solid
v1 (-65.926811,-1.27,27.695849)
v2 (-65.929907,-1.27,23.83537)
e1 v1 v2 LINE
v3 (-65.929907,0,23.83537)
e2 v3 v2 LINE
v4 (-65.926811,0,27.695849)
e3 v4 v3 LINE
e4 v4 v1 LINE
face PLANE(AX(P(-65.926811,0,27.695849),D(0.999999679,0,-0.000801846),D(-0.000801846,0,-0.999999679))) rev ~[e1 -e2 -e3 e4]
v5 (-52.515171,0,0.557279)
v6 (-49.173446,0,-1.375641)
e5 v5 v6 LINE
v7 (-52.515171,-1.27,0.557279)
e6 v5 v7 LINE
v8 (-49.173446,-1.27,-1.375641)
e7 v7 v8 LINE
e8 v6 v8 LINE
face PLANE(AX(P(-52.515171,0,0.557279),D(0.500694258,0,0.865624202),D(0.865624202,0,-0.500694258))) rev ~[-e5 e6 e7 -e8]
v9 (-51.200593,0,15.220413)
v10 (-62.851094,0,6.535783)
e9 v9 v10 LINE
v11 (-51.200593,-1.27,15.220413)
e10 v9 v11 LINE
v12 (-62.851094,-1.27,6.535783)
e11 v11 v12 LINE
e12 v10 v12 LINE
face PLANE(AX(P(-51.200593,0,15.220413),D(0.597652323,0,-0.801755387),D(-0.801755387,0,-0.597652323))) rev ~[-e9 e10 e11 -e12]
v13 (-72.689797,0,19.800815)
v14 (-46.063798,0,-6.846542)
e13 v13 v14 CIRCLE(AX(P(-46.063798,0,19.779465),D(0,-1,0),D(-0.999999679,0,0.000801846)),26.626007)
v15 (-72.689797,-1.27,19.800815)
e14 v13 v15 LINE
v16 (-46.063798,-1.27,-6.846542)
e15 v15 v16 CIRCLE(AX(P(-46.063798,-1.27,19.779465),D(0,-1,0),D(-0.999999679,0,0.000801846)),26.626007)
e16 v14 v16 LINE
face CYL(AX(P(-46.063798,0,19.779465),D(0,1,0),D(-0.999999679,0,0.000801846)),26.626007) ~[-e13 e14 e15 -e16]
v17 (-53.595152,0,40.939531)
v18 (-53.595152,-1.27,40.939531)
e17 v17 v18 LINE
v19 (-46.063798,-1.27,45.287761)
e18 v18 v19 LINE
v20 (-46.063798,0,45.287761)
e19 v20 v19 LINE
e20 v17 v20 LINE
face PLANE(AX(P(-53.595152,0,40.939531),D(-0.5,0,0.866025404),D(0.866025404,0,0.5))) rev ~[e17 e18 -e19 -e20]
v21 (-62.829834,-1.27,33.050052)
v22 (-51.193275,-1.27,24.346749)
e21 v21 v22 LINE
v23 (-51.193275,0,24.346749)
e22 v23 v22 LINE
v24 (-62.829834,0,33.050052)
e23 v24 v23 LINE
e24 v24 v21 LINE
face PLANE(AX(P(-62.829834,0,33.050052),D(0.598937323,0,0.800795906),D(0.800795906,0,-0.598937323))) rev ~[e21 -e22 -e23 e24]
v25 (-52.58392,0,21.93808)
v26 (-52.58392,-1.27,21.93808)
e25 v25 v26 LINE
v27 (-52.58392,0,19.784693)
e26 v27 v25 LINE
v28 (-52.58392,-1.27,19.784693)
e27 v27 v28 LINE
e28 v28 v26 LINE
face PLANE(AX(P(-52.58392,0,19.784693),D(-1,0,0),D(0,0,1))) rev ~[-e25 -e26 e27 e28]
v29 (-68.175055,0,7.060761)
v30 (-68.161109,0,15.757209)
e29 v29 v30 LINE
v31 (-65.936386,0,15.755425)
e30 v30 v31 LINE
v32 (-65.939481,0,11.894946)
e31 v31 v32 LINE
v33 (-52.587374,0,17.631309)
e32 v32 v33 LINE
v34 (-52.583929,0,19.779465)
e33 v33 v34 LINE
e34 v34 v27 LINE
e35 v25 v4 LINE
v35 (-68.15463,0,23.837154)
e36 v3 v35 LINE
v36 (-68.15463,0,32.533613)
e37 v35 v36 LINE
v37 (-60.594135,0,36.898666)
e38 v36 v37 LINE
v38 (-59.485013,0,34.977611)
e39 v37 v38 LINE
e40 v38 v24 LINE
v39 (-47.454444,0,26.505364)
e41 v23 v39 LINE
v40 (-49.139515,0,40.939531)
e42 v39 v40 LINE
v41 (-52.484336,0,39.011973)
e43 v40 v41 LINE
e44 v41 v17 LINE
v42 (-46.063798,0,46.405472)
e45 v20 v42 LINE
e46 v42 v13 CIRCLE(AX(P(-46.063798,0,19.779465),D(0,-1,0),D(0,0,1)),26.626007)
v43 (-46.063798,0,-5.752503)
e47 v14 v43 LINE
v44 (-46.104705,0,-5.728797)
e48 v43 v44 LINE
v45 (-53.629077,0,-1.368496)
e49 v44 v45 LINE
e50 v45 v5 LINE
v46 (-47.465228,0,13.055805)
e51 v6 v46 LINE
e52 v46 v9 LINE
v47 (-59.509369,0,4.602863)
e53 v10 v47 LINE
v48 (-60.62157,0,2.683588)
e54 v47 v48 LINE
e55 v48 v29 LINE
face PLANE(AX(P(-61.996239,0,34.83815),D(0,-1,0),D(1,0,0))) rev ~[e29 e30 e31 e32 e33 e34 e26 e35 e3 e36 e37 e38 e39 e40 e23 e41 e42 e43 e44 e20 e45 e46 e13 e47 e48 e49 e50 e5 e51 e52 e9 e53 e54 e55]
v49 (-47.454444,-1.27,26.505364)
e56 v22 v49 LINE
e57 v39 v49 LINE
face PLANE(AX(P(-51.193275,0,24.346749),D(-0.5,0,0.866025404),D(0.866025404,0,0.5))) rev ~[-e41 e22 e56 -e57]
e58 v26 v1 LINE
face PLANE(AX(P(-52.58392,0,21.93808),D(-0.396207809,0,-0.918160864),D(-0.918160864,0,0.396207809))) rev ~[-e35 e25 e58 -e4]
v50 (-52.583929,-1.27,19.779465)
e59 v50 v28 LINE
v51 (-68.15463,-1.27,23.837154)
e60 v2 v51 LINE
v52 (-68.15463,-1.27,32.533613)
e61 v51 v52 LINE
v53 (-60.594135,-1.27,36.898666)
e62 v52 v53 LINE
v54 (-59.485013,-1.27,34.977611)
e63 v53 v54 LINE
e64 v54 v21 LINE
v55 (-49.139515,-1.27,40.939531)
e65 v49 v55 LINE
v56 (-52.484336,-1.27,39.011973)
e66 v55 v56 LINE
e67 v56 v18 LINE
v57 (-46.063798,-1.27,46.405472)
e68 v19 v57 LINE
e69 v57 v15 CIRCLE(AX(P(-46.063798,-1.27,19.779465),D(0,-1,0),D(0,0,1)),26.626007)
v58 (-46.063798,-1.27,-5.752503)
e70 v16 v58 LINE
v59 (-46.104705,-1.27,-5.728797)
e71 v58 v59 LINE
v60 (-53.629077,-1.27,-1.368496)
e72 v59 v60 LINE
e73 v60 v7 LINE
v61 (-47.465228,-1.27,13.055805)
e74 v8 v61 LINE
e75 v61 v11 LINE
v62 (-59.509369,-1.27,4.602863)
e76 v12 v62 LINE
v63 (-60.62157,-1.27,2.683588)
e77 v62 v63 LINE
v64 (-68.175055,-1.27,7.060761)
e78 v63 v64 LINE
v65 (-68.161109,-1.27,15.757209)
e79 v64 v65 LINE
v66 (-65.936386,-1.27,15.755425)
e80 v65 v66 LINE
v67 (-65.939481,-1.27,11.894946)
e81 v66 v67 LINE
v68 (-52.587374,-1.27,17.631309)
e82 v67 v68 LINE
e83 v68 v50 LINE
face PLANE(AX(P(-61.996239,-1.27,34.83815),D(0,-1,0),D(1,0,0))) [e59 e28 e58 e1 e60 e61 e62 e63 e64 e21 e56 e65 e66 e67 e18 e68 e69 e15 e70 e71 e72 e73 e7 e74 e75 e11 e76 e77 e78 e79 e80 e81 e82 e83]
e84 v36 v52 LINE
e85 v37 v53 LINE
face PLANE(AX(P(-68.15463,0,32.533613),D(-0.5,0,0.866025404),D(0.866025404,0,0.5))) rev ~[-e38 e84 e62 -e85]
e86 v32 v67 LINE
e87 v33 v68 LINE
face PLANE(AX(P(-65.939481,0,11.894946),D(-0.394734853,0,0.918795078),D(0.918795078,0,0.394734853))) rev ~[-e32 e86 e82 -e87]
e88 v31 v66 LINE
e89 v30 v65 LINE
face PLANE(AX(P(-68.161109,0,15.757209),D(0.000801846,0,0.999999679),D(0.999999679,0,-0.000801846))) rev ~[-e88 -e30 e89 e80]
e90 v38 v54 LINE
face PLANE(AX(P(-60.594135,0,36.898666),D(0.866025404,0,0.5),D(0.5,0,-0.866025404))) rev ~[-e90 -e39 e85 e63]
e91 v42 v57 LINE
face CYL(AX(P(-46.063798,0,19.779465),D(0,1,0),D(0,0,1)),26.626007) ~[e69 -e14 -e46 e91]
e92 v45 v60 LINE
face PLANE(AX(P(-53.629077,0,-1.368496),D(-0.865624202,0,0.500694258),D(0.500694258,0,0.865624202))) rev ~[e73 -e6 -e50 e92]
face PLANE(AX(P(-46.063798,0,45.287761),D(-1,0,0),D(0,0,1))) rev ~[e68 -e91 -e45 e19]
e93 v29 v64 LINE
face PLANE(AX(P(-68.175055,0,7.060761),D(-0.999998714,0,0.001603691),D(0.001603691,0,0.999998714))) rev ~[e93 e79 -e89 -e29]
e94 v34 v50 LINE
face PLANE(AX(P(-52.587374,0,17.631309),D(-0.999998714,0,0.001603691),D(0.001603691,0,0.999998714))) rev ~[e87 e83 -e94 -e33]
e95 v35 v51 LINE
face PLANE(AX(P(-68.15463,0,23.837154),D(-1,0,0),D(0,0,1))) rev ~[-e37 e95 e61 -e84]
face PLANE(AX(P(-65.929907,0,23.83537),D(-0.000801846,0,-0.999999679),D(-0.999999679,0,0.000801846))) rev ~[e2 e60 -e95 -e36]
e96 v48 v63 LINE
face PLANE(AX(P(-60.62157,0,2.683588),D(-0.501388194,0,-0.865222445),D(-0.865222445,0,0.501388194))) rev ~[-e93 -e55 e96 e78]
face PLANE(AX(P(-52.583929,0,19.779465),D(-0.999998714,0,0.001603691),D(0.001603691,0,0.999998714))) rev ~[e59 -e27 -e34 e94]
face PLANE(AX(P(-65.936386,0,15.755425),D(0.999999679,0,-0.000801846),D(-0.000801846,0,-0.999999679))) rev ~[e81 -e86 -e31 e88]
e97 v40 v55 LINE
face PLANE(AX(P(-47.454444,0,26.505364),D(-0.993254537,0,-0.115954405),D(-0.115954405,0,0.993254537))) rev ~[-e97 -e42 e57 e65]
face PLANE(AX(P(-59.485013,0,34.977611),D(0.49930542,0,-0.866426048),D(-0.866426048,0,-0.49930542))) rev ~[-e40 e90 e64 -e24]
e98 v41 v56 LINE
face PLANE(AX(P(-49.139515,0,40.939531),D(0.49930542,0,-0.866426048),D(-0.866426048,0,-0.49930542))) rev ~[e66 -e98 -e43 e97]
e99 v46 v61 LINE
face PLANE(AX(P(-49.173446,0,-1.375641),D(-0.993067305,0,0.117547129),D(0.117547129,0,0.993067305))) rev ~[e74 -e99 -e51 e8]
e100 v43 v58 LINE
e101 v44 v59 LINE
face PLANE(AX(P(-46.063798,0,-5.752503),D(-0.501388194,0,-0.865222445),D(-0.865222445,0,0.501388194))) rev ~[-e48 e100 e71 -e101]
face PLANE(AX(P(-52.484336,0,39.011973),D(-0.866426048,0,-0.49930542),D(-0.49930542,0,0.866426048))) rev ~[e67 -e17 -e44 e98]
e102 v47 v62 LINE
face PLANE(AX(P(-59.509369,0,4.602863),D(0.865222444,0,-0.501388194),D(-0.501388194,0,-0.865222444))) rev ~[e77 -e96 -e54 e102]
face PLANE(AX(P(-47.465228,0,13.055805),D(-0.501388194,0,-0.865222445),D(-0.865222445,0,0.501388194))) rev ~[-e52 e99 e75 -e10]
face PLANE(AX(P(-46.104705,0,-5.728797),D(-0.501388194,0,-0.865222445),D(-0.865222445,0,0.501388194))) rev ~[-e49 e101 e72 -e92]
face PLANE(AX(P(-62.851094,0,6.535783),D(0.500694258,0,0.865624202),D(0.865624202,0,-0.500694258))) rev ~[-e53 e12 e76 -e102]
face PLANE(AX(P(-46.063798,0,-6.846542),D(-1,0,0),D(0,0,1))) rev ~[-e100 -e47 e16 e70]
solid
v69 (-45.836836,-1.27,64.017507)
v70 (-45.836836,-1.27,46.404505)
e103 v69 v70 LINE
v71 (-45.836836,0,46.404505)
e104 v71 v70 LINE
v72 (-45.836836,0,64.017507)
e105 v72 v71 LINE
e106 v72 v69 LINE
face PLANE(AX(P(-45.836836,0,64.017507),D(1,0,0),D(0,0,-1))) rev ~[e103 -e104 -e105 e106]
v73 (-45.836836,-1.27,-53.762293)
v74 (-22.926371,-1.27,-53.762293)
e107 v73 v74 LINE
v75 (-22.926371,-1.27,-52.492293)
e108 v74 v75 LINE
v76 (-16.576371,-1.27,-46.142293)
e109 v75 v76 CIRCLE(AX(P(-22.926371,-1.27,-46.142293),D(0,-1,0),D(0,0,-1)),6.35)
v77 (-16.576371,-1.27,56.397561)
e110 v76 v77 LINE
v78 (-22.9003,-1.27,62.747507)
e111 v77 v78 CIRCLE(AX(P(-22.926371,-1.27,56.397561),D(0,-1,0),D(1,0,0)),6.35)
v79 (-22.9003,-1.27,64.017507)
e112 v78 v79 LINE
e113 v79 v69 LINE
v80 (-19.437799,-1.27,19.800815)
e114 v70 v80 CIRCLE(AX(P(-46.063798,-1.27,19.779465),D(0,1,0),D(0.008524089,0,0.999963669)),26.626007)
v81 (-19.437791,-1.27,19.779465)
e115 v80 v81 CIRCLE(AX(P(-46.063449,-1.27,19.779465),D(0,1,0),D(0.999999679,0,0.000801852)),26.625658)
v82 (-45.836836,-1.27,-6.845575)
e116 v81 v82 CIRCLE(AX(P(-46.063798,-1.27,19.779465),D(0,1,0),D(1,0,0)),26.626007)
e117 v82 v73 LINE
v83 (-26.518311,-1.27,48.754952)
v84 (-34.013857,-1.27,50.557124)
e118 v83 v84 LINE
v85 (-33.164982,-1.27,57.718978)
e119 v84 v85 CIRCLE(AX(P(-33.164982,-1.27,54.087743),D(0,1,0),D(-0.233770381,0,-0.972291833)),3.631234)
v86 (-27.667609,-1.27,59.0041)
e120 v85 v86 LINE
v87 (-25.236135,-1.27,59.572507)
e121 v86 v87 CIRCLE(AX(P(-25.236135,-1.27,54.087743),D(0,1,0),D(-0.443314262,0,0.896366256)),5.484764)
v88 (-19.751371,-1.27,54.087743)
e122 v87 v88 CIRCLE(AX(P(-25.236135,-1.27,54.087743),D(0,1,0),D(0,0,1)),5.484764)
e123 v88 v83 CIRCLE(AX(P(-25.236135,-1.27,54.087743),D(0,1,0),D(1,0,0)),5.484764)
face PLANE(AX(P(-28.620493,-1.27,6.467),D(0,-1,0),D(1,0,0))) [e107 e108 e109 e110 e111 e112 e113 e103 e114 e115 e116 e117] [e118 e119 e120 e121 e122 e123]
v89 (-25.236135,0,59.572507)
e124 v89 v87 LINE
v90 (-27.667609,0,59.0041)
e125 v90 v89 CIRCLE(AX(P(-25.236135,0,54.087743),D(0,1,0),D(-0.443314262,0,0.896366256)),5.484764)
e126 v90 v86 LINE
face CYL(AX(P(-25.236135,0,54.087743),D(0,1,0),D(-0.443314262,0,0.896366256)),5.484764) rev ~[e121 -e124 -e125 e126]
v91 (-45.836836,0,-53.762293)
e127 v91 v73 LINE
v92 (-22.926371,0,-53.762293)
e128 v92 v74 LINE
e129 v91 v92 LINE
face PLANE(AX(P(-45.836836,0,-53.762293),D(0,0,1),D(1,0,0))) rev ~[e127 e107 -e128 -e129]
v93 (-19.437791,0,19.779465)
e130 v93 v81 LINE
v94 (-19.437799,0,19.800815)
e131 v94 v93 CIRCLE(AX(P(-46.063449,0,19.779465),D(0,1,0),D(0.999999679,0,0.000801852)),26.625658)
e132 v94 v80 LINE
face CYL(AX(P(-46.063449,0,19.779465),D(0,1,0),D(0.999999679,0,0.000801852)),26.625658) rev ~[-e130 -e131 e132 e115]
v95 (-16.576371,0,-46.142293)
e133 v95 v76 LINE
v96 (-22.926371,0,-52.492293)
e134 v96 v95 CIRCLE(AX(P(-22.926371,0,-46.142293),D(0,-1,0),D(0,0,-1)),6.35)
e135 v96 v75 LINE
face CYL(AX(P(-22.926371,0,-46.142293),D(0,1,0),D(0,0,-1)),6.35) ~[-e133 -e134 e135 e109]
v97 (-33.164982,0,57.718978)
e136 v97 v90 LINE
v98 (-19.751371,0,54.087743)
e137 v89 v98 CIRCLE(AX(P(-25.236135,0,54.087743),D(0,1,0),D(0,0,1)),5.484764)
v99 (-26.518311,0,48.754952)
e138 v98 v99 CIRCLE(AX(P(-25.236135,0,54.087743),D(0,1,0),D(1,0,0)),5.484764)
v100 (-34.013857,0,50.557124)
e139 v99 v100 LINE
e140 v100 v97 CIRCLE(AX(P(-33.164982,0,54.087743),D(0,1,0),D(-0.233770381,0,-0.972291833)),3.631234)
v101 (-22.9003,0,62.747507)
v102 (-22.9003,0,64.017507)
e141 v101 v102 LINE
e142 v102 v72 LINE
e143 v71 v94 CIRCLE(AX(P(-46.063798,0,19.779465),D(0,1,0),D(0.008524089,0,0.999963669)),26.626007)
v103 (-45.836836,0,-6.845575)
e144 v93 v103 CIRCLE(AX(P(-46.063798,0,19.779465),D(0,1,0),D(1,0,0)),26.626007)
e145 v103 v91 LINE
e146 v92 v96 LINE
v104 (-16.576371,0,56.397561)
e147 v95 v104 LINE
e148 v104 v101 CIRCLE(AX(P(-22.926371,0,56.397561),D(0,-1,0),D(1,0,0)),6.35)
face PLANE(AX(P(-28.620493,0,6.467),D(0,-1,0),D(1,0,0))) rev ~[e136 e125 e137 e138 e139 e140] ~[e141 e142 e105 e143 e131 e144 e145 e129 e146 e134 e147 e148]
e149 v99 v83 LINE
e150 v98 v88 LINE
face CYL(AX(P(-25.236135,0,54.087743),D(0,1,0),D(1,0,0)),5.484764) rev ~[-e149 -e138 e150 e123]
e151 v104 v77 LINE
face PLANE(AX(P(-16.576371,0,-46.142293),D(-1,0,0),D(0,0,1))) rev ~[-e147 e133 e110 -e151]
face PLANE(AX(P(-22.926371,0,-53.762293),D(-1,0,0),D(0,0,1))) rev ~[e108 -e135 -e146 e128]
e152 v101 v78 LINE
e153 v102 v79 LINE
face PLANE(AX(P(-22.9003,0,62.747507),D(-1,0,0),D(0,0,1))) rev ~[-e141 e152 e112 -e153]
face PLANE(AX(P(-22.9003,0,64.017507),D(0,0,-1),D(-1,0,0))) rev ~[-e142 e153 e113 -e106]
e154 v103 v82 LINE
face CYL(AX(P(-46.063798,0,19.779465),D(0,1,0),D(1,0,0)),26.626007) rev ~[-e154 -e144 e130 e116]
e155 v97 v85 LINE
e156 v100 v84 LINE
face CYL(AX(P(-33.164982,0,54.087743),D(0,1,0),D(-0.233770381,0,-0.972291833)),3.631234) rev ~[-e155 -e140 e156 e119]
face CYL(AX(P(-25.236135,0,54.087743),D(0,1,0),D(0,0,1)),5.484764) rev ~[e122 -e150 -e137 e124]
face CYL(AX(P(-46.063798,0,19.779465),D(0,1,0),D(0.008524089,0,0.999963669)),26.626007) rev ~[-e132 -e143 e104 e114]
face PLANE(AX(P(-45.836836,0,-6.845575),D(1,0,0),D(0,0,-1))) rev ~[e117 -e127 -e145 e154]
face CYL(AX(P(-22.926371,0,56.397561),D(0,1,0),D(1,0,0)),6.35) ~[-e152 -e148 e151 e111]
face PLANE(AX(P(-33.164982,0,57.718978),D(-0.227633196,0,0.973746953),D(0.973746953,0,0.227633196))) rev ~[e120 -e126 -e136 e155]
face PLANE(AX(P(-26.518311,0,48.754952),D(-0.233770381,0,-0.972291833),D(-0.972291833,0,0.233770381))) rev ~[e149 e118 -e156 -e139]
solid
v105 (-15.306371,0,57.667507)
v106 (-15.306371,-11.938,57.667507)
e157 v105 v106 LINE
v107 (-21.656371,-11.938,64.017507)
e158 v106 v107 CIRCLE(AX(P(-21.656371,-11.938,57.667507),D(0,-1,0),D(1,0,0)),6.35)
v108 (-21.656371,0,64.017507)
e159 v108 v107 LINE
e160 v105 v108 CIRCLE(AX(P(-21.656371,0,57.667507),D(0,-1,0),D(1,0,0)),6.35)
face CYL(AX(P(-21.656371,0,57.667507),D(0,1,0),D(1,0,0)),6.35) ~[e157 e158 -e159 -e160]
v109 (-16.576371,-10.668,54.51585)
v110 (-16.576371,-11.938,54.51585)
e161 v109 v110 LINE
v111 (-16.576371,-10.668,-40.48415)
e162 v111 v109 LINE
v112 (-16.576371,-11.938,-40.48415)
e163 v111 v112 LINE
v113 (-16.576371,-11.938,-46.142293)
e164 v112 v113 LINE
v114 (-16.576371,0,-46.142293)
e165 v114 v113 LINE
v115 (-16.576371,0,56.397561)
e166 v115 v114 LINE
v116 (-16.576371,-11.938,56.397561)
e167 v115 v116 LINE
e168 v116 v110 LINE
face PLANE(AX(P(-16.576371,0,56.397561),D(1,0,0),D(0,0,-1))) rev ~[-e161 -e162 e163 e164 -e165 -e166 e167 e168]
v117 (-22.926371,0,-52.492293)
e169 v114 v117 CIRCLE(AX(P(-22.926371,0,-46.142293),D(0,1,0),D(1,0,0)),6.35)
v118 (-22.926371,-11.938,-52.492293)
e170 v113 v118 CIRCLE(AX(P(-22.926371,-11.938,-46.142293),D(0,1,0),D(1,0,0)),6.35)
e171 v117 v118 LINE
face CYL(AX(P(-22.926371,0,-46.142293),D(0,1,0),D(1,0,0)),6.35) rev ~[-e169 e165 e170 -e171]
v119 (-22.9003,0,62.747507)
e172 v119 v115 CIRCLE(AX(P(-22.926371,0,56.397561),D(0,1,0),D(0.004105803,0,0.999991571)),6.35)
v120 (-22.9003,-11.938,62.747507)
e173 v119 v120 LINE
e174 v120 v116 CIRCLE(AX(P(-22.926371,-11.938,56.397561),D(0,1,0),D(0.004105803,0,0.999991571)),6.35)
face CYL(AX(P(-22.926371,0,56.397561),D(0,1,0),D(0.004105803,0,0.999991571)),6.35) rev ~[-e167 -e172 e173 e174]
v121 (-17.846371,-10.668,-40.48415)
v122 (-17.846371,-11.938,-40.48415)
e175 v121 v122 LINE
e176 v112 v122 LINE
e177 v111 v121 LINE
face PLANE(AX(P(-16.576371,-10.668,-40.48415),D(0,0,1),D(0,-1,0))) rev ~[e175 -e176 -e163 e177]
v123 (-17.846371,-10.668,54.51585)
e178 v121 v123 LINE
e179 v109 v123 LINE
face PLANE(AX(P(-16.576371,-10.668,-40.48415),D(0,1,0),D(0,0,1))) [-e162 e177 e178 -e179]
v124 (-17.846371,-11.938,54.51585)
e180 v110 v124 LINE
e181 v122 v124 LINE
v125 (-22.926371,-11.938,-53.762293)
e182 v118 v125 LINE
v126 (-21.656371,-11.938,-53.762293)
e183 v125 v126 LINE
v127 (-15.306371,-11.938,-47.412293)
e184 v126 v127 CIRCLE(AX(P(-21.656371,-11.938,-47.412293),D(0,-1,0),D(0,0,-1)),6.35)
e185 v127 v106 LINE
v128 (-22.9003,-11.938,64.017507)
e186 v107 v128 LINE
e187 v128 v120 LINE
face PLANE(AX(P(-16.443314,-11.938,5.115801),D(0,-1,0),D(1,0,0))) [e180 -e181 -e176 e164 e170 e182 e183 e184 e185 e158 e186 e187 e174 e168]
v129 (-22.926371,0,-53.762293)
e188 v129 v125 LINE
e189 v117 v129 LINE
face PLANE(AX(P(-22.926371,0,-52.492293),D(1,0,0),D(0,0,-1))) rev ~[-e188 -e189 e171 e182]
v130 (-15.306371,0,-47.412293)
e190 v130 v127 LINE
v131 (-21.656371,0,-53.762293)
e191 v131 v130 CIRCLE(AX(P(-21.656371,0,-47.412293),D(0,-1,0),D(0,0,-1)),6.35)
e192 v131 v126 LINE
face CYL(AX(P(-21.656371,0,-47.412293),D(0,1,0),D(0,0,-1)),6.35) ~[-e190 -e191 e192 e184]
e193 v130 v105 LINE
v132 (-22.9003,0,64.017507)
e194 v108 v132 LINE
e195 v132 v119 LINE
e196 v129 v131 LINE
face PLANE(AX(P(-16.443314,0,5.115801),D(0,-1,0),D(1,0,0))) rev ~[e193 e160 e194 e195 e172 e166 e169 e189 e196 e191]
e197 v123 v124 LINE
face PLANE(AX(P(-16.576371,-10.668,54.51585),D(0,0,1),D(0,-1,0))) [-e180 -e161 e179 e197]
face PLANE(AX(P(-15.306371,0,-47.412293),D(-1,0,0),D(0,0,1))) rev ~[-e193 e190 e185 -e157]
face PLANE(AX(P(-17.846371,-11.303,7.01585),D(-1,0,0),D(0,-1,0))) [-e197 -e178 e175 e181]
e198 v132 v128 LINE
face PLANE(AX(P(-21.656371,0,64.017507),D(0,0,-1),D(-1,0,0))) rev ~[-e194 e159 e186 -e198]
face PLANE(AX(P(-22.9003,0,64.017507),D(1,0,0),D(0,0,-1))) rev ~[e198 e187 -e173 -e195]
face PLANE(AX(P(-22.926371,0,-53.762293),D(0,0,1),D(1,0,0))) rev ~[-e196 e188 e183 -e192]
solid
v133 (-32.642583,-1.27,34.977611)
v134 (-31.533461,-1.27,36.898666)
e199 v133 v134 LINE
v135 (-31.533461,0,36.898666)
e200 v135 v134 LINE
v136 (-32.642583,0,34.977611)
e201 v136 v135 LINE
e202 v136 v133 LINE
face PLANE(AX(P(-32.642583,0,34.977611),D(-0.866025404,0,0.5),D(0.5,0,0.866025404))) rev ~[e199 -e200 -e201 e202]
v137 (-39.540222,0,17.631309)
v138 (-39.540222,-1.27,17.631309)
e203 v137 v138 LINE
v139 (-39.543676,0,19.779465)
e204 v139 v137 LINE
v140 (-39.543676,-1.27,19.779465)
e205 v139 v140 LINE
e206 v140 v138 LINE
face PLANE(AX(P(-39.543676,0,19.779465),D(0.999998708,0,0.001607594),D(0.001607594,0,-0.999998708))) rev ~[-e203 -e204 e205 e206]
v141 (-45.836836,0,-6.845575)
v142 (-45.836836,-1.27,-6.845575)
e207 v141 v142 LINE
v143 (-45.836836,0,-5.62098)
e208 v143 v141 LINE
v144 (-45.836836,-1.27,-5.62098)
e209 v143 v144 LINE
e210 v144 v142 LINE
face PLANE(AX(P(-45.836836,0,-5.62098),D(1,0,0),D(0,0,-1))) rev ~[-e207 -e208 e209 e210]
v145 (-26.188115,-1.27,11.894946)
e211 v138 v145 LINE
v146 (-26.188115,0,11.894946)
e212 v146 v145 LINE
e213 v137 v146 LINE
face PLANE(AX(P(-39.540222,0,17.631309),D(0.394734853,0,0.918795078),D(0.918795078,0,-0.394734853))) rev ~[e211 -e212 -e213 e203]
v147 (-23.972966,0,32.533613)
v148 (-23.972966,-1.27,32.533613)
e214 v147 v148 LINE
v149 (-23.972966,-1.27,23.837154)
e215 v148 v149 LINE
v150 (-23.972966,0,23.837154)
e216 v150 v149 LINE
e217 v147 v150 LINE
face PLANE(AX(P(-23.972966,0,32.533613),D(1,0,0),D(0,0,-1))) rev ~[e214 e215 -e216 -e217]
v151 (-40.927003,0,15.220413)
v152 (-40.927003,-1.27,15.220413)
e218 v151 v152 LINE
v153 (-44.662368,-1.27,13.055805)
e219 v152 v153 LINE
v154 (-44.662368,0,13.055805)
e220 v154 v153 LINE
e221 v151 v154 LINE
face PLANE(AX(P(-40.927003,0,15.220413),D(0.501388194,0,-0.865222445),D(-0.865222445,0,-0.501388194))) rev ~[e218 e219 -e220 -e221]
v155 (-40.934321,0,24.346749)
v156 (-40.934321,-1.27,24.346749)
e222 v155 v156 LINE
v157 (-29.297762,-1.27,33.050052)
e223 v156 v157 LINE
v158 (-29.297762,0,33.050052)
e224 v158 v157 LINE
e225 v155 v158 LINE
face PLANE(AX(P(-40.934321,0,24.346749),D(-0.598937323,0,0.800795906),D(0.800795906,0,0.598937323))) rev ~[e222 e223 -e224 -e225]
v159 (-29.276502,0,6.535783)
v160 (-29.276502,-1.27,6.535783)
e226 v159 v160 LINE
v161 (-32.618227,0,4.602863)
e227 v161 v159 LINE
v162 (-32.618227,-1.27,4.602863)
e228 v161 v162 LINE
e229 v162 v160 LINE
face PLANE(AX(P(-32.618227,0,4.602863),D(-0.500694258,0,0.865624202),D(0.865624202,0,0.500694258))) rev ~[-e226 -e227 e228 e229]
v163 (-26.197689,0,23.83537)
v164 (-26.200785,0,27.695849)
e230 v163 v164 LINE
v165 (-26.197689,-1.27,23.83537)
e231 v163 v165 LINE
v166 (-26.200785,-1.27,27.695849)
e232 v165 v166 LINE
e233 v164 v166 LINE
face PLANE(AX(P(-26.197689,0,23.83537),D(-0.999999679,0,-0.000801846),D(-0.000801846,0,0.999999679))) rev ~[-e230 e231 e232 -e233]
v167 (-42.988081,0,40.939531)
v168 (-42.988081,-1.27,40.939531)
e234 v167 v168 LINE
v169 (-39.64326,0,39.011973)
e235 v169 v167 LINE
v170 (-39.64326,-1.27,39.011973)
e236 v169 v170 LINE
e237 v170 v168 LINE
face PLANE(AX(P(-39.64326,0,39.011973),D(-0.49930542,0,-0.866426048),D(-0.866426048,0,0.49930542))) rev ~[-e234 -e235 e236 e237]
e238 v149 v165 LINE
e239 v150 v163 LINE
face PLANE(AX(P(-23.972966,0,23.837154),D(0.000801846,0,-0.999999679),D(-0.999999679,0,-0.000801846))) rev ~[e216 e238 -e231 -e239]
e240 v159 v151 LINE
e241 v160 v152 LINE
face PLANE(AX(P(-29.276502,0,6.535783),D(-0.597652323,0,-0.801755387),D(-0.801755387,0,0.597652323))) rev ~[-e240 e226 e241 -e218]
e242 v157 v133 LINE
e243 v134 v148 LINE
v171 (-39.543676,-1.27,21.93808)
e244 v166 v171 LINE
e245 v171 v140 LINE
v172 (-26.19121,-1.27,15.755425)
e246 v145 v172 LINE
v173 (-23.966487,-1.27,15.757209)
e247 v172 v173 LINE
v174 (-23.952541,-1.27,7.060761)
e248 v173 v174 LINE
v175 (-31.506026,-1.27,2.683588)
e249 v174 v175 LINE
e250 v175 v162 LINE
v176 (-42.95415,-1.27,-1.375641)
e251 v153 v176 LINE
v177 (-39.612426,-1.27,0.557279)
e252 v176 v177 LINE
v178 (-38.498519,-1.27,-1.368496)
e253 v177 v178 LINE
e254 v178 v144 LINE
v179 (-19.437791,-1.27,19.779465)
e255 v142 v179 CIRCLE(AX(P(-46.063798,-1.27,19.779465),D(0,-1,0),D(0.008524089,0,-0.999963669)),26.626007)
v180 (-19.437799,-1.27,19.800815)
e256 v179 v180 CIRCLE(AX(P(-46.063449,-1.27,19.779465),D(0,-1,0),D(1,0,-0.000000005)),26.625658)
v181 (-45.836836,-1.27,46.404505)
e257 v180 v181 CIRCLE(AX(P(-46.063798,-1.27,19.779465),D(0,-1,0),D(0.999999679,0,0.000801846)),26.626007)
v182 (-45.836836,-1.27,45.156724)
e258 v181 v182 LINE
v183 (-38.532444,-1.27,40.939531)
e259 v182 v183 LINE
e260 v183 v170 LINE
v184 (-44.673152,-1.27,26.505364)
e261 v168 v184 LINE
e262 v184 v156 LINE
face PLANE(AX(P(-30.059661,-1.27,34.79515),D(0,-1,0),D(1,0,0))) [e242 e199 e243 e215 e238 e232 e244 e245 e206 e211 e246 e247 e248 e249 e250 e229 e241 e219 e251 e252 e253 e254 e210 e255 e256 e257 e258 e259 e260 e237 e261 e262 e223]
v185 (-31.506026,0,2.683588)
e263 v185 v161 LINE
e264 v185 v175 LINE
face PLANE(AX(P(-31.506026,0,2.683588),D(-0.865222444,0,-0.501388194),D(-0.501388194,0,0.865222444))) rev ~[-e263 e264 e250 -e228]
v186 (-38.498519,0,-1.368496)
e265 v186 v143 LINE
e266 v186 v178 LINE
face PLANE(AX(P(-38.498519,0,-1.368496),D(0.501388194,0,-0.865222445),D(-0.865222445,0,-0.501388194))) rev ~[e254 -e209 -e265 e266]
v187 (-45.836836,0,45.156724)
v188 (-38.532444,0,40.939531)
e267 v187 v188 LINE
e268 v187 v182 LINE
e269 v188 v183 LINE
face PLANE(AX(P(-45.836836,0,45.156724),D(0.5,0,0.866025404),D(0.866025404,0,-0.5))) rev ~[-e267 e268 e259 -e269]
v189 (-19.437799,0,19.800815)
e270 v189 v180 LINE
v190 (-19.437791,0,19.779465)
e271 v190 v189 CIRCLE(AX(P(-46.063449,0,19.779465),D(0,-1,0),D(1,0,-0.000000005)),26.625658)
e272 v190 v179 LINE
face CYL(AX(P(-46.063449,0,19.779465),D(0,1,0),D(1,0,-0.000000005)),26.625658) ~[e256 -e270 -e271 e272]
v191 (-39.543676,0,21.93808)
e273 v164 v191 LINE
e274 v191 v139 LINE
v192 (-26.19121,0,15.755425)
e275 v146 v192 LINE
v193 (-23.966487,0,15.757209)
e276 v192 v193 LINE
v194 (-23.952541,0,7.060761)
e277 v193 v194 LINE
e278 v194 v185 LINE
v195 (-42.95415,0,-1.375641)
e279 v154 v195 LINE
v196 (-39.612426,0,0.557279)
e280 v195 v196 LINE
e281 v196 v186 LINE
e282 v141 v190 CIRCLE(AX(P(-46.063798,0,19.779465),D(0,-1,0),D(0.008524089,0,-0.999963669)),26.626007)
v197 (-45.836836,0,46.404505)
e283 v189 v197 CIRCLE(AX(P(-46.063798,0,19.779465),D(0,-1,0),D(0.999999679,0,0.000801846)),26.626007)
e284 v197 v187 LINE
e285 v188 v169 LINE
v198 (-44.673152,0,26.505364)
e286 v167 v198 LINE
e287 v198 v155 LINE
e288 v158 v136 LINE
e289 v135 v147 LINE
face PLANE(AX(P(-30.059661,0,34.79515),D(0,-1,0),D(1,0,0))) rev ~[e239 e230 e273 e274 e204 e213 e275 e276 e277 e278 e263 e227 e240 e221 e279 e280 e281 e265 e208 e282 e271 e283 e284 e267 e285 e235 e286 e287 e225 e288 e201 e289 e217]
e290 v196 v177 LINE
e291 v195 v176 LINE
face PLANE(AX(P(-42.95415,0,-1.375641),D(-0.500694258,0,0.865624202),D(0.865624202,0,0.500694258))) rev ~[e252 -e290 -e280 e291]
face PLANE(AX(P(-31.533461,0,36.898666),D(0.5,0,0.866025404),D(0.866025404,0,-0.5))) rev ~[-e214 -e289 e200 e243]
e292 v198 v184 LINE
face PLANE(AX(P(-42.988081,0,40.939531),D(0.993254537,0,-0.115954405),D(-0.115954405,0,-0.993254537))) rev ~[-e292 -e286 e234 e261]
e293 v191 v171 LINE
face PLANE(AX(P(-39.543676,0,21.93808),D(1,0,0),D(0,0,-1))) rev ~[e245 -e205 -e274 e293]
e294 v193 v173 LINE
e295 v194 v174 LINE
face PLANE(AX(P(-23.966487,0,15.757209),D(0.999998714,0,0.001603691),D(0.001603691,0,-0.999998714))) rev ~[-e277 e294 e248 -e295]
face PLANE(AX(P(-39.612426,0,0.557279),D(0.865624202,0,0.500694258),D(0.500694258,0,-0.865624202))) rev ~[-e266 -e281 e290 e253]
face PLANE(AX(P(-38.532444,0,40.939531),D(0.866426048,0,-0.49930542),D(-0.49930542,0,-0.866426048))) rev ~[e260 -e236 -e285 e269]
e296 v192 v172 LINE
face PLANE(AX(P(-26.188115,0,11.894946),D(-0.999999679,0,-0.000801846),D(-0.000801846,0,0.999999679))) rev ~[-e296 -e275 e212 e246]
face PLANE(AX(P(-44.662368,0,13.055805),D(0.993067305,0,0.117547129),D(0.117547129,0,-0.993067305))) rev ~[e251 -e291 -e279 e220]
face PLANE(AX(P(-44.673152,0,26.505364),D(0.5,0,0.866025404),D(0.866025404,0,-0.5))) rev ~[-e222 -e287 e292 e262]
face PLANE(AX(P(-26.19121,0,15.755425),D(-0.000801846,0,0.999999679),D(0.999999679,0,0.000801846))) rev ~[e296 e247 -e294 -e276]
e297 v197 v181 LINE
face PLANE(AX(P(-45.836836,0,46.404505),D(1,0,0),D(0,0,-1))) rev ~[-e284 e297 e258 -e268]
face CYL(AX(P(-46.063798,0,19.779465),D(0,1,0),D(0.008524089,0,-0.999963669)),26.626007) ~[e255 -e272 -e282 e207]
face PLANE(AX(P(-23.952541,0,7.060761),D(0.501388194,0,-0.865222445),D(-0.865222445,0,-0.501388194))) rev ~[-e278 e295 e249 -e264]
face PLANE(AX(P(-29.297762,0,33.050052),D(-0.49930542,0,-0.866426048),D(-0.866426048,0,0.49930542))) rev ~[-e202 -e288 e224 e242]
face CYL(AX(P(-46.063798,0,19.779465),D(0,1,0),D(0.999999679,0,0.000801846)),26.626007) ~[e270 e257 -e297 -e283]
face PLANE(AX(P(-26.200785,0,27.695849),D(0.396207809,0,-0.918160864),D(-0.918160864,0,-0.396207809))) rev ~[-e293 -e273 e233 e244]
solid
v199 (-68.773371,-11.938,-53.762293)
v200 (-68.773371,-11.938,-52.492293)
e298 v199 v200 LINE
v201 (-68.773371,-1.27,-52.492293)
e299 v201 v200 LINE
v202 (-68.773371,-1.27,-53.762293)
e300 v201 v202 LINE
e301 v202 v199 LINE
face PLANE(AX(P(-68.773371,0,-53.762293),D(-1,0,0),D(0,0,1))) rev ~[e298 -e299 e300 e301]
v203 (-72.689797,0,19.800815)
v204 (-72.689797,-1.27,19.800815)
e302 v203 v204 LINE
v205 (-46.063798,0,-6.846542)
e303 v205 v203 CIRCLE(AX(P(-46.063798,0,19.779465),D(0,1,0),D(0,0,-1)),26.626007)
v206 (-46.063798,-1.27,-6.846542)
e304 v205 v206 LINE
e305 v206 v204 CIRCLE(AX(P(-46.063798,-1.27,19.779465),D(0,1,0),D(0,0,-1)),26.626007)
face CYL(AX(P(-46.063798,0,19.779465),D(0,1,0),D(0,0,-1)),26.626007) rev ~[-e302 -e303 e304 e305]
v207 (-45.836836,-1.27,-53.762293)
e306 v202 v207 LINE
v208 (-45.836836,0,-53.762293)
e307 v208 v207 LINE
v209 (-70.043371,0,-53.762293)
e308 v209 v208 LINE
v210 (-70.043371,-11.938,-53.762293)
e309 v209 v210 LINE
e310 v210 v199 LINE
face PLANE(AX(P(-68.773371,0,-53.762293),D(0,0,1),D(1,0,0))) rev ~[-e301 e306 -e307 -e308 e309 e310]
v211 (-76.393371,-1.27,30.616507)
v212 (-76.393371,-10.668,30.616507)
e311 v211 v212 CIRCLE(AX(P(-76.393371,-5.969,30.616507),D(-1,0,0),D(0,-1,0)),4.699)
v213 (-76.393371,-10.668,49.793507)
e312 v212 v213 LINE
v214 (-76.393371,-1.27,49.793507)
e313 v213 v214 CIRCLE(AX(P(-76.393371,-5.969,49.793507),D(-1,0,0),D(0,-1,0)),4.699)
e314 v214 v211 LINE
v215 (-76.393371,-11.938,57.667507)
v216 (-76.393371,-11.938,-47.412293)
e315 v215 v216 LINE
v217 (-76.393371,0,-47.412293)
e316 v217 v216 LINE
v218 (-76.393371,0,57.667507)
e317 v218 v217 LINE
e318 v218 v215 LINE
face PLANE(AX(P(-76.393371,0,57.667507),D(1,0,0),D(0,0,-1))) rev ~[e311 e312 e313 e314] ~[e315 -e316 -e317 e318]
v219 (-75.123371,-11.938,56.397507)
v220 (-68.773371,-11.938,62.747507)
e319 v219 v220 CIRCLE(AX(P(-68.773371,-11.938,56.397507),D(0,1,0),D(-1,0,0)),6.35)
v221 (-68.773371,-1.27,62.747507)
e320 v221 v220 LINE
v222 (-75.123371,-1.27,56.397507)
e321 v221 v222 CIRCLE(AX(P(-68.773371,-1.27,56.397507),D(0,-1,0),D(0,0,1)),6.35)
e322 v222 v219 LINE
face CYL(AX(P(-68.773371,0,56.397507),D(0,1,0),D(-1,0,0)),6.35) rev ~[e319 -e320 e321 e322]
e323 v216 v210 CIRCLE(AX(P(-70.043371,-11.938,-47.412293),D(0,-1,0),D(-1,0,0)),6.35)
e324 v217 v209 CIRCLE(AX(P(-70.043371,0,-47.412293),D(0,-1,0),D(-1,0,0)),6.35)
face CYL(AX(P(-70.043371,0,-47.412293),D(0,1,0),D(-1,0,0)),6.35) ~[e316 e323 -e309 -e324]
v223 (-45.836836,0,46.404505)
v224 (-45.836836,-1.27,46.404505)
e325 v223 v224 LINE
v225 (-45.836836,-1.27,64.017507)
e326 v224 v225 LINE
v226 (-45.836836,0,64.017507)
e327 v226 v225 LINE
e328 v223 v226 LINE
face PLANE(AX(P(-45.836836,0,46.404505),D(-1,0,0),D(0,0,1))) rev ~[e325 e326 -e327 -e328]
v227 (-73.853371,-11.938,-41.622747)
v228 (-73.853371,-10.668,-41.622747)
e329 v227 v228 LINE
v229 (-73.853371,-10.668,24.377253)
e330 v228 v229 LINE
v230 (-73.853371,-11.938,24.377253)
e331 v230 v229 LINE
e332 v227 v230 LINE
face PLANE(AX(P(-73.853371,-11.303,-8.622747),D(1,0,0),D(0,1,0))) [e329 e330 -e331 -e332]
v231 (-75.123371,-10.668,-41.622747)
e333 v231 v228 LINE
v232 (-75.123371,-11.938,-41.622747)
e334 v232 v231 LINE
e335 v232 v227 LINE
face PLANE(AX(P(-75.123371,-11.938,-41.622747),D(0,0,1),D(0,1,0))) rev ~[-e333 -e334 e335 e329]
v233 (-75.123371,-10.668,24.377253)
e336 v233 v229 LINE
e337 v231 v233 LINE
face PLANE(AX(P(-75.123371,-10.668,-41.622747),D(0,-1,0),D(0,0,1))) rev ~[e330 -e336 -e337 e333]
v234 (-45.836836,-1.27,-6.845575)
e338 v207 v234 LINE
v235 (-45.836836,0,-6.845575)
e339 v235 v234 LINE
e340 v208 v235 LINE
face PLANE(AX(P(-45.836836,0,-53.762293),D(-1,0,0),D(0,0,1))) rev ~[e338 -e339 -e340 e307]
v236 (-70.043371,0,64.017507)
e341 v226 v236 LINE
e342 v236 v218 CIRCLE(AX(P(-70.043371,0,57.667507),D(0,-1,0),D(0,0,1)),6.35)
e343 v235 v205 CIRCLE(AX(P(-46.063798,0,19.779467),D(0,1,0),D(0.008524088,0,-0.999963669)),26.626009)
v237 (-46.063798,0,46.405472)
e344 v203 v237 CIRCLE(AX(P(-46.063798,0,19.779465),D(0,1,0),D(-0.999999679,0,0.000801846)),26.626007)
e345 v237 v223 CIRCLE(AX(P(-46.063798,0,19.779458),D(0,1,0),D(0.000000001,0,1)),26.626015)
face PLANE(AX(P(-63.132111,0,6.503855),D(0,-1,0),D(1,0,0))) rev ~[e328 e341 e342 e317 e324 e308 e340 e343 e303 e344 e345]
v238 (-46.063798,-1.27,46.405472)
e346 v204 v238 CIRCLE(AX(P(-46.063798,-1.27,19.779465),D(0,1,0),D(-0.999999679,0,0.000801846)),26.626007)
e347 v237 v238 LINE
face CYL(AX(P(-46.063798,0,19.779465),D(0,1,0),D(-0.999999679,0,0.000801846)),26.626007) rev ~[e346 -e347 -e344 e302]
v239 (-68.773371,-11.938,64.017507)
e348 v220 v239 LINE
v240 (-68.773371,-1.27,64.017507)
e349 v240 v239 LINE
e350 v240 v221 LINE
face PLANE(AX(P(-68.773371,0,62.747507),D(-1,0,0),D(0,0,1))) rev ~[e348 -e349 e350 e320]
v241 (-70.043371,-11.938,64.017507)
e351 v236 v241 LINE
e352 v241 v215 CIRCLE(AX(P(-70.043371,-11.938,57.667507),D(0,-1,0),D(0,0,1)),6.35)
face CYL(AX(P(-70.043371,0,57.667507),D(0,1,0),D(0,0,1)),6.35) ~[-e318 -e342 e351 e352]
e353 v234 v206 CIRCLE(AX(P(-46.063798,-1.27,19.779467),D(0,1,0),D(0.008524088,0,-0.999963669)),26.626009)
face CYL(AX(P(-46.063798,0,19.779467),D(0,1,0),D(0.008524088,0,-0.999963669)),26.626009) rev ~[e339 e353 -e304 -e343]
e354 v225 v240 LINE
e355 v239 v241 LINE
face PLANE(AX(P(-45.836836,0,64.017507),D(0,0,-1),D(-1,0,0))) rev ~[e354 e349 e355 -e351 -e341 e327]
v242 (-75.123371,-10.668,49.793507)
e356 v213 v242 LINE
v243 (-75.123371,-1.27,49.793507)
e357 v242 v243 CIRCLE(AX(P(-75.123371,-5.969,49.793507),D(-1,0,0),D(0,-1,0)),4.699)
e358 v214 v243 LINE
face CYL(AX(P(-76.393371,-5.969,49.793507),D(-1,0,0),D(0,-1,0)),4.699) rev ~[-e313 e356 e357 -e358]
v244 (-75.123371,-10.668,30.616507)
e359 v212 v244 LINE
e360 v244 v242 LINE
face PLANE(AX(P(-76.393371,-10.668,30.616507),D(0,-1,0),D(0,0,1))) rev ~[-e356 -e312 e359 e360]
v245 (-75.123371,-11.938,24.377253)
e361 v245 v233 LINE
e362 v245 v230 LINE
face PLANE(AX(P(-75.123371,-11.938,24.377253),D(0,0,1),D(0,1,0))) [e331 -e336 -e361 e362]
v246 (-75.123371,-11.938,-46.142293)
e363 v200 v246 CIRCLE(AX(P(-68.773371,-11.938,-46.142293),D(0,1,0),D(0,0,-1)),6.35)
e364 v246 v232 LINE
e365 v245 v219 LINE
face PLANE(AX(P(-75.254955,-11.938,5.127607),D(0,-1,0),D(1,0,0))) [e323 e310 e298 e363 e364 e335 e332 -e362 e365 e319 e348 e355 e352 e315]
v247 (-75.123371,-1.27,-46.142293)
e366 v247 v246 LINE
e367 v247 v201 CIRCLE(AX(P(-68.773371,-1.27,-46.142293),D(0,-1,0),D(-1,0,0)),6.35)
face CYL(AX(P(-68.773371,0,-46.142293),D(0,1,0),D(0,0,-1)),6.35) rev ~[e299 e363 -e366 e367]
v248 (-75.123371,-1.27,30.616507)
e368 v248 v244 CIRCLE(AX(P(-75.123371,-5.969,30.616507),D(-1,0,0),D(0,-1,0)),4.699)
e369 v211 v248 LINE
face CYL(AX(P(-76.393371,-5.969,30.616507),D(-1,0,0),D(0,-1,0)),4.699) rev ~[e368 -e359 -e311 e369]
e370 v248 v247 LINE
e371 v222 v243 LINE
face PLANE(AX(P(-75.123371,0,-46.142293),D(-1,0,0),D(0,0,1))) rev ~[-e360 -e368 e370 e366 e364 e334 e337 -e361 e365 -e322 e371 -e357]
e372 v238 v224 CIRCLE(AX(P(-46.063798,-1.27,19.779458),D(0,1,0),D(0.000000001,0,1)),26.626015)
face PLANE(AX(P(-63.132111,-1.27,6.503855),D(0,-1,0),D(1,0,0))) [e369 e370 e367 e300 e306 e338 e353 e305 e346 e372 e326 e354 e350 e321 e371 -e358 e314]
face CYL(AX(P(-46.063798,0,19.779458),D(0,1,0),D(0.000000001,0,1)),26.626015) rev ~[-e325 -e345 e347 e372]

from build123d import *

# Parameters (mm, degrees)
F1_DEPTH  = 1.27
F2_DEPTH  = 11.938
F4_DEPTH  = 25.4
F5_DEPTH  = 1.27
F6_DEPTH  = 1.27
F7_W      = 1.27
F7_H      = 66
F8_DEPTH  = 1.27
F9_W      = 1.27
F9_H      = 95
F10_DEPTH = 1.27


# Not quite as in the source:
# - ends of sketch curves that miss each other by under 0.0002 mm in the source are joined


with BuildPart() as f1:
    # F0 (on Front) → F1 (new body)
    with BuildSketch(Plane.XZ):
        with BuildLine():
            ThreePointArc((-68.7733714747, 62.7475070371), (-73.2634995352, 60.8876350976), (-75.1233714747, 56.3975070371))
            Line((-75.1233714747, 56.3975070371), (-75.1233714747, -46.1422929629))
            ThreePointArc((-75.1233714747, -46.1422929629), (-73.2634995352, -50.6324210235), (-68.7733714747, -52.4922929629))
            Line((-68.7733714747, -52.4922929629), (-68.7733714747, -53.7622929629))
            Line((-68.7733714747, -53.7622929629), (-45.83683555, -53.7622929629))
            Line((-45.83683555, -53.7622929629), (-45.83683555, -6.8455746123))
            ThreePointArc((-45.83683555, -6.8455746123), (-45.9503157475, -6.8463001174), (-46.0637980065, -6.8465419539))
            ThreePointArc((-46.0637980065, -6.8465419539), (-64.8987750617, 0.95958485), (-72.689796607, 19.800815161))
            ThreePointArc((-72.689796607, 19.800815161), (-64.8836783627, 38.6144422615), (-46.0637980065, 46.4054723665))
            ThreePointArc((-46.0637980065, 46.4054723665), (-45.9503157475, 46.4052305299), (-45.83683555, 46.4045050248))
            Line((-45.83683555, 46.4045050248), (-45.83683555, 64.0175070371))
            Line((-45.83683555, 64.0175070371), (-68.7733714747, 64.0175070371))
            Line((-68.7733714747, 64.0175070371), (-68.7733714747, 62.7475070371))
        make_face()
    extrude(amount=F1_DEPTH)

    # F0 (on Front) → F2 (join)
    with BuildSketch(Plane.XZ):
        with BuildLine():
            Line((-75.1233714747, -46.1422929629), (-75.1233714747, 56.3975070371))
            ThreePointArc((-75.1233714747, 56.3975070371), (-73.2634995352, 60.8876350976), (-68.7733714747, 62.7475070371))
            Line((-68.7733714747, 62.7475070371), (-68.7733714747, 64.0175070371))
            Line((-68.7733714747, 64.0175070371), (-70.0433714747, 64.0175070371))
            ThreePointArc((-70.0433714747, 64.0175070371), (-74.5334995352, 62.1576350976), (-76.3933714747, 57.6675070371))
            Line((-76.3933714747, 57.6675070371), (-76.3933714747, -47.4122929629))
            ThreePointArc((-76.3933714747, -47.4122929629), (-74.5334995352, -51.9024210235), (-70.0433714747, -53.7622929629))
            Line((-70.0433714747, -53.7622929629), (-68.7733714747, -53.7622929629))
            Line((-68.7733714747, -53.7622929629), (-68.7733714747, -52.4922929629))
            ThreePointArc((-68.7733714747, -52.4922929629), (-73.2634995352, -50.6324210235), (-75.1233714747, -46.1422929629))
        make_face()
    extrude(amount=F2_DEPTH)

    # F3 (on face) → F4 (cut)
    with BuildSketch(Plane(origin=(-76.3933714747, 0, 0), x_dir=(0, -1, 0), z_dir=(-1, 0, 0))):
        with BuildLine():
            Line((10.668, 30.6165070371), (10.668, 49.7935070371))
            ThreePointArc((10.668, 49.7935070371), (5.969, 45.0945070371), (1.27, 49.7935070371))
            Line((1.27, 49.7935070371), (1.27, 30.6165070371))
            ThreePointArc((1.27, 30.6165070371), (5.969, 35.3155070371), (10.668, 30.6165070371))
        make_face()
        with BuildLine():
            ThreePointArc((1.27, 49.7935070371), (5.969, 45.0945070371), (10.668, 49.7935070371))
            ThreePointArc((10.668, 49.7935070371), (5.969, 54.4925070371), (1.27, 49.7935070371))
        make_face()
        with BuildLine():
            ThreePointArc((1.27, 30.6165070371), (5.969, 25.9175070371), (10.668, 30.6165070371))
            ThreePointArc((10.668, 30.6165070371), (5.969, 35.3155070371), (1.27, 30.6165070371))
        make_face()
    extrude(amount=-F4_DEPTH, mode=Mode.SUBTRACT)

    # F7 (on face) → F8 (join)
    with BuildSketch(Plane.YZ.offset(-75.1233714747)):
        with Locations((-11.303, -8.6227470934)):
            Rectangle(F7_W, F7_H)
    extrude(amount=F8_DEPTH)


with BuildPart() as f2:
    # F0 (on Front) → F2, piece 2 (new body)
    with BuildSketch(Plane.XZ):
        with BuildLine():
            Line((-21.6563714747, 64.0175070371), (-22.9002996252, 64.0175070371))
            Line((-22.9002996252, 64.0175070371), (-22.9002996252, 62.7475070371))
            ThreePointArc((-22.9002996252, 62.7475070371), (-18.4270350656, 60.8784613489), (-16.5763714747, 56.3975605602))
            Line((-16.5763714747, 56.3975605602), (-16.5763714747, -46.1422929629))
            ThreePointArc((-16.5763714747, -46.1422929629), (-18.4362434142, -50.6324210235), (-22.9263714747, -52.4922929629))
            Line((-22.9263714747, -52.4922929629), (-22.9263714747, -53.7622929629))
            Line((-22.9263714747, -53.7622929629), (-21.6563714747, -53.7622929629))
            ThreePointArc((-21.6563714747, -53.7622929629), (-17.1662434142, -51.9024210235), (-15.3063714747, -47.4122929629))
            Line((-15.3063714747, -47.4122929629), (-15.3063714747, 57.6675070371))
            ThreePointArc((-15.3063714747, 57.6675070371), (-17.1662434142, 62.1576350976), (-21.6563714747, 64.0175070371))
        make_face()
    extrude(amount=F2_DEPTH)

    # F9 (on face) → F10 (join)
    with BuildSketch(Plane(origin=(-16.5763714747, 0, 0), x_dir=(0, -1, 0), z_dir=(-1, 0, 0))):
        with Locations((11.303, 7.0158497989)):
            Rectangle(F9_W, F9_H)
    extrude(amount=F10_DEPTH)


with BuildPart() as f5:
    # F0 (on Front) → F5 (new body)
    with BuildSketch(Plane.XZ):
        with BuildLine():
            Line((-22.9002996252, 64.0175070371), (-45.83683555, 64.0175070371))
            Line((-45.83683555, 64.0175070371), (-45.83683555, 46.4045050248))
            ThreePointArc((-45.83683555, 46.4045050248), (-27.1638123458, 38.534059292), (-19.437799406, 19.800815161))
            ThreePointArc((-19.437799406, 19.800815161), (-19.4377929862, 19.7901401845), (-19.4377908463, 19.7794652063))
            ThreePointArc((-19.4377908463, 19.7794652063), (-27.1562947169, 1.0324500665), (-45.83683555, -6.8455746123))
            Line((-45.83683555, -6.8455746123), (-45.83683555, -53.7622929629))
            Line((-45.83683555, -53.7622929629), (-22.9263714747, -53.7622929629))
            Line((-22.9263714747, -53.7622929629), (-22.9263714747, -52.4922929629))
            ThreePointArc((-22.9263714747, -52.4922929629), (-18.4362434142, -50.6324210235), (-16.5763714747, -46.1422929629))
            Line((-16.5763714747, -46.1422929629), (-16.5763714747, 56.3975605602))
            ThreePointArc((-16.5763714747, 56.3975605602), (-18.4270350656, 60.8784613489), (-22.9002996252, 62.7475070371))
            Line((-22.9002996252, 62.7475070371), (-22.9002996252, 64.0175070371))
        make_face()
        with BuildLine():
            ThreePointArc((-25.2361353487, 59.5725070371), (-21.3578216202, 57.9660568916), (-19.7513714747, 54.0877431631))
            ThreePointArc((-19.7513714747, 54.0877431631), (-21.8412711567, 49.7798977769), (-26.5183106895, 48.7549520413))
            Line((-26.5183106895, 48.7549520413), (-34.0138568088, 50.5571235836))
            ThreePointArc((-34.0138568088, 50.5571235836), (-36.7709747399, 54.5151516939), (-33.1649817526, 57.7189775918))
            Line((-33.1649817526, 57.7189775918), (-27.6676093993, 59.0041004217))
            ThreePointArc((-27.6676093993, 59.0041004217), (-26.4846496797, 59.4285152719), (-25.2361353487, 59.5725070371))
        make_face(mode=Mode.SUBTRACT)
    extrude(amount=F5_DEPTH)


with BuildPart() as f6:
    # F0 (on Front) → F6 (new body)
    with BuildSketch(Plane.XZ):
        with BuildLine():
            ThreePointArc((-19.437799406, 19.800815161), (-27.1638123458, 38.534059292), (-45.83683555, 46.4045050248))
            Line((-45.83683555, 46.4045050248), (-45.83683555, 45.1567237107))
            Line((-45.83683555, 45.1567237107), (-38.5324436739, 40.9395310947))
            Line((-38.5324436739, 40.9395310947), (-31.5334607695, 36.8986664309))
            Line((-31.5334607695, 36.8986664309), (-23.972966235, 32.5336128762))
            Line((-23.972966235, 32.5336128762), (-23.972966235, 23.8371539736))
            Line((-23.972966235, 23.8371539736), (-23.972966235, 19.8148920808))
            Line((-23.972966235, 19.8148920808), (-23.972966235, 19.7971786549))
            Line((-23.972966235, 19.7971786549), (-19.437799406, 19.800815161))
        make_face()
        with BuildLine():
            Line((-45.83683555, -5.6209802107), (-45.83683555, -6.8455746123))
            ThreePointArc((-45.83683555, -6.8455746123), (-27.1562947169, 1.0324500665), (-19.4377908463, 19.7794652063))
            ThreePointArc((-19.4377908463, 19.7794652063), (-19.4377929862, 19.7901401845), (-19.437799406, 19.800815161))
            Line((-19.437799406, 19.800815161), (-23.972966235, 19.7971786549))
            Line((-23.972966235, 19.7971786549), (-23.972966235, 19.7794652063))
            Line((-23.972966235, 19.7794652063), (-23.9664873618, 15.7572085313))
            Line((-23.9664873618, 15.7572085313), (-23.9525409264, 7.0607608116))
            Line((-23.9525409264, 7.0607608116), (-31.5060255403, 2.6835881708))
            Line((-31.5060255403, 2.6835881708), (-38.4985191452, -1.3684955049))
            Line((-38.4985191452, -1.3684955049), (-45.83683555, -5.6209802107))
        make_face()
        Polygon((-31.5334607695, 36.8986664309), (-38.5324436739, 40.9395310947), (-39.6432602587, 39.0119725608), (-32.6425828079, 34.9776107085), align=None)
        Polygon((-23.972966235, 19.7794652063), (-23.972966235, 19.7971786549), (-26.1944497484, 19.7953973669), (-26.1912103118, 15.7554246458), (-23.9664873618, 15.7572085313), align=None)
        Polygon((-26.1944497484, 19.7953973669), (-23.972966235, 19.7971786549), (-23.972966235, 19.8148920808), (-23.972966235, 23.8371539736), (-26.1976891851, 23.835370088), align=None)
        Polygon((-39.6124255104, 0.5572791435), (-38.4985191452, -1.3684955049), (-31.5060255403, 2.6835881708), (-32.6182269329, 4.6028627334), align=None)
        Polygon((-39.6432602587, 39.0119725608), (-42.988080594, 40.9395310947), (-44.6731523984, 26.5053643083), (-40.9343213249, 24.3467491815), (-29.2977624726, 33.0500521746), (-32.6425828079, 34.9776107085), align=None)
        Polygon((-26.1912103118, 15.7554246458), (-26.1944497484, 19.7953973669), (-39.5436757168, 19.7846933413), (-39.5436757168, 19.7794652063), (-39.5402223489, 17.6313091186), (-26.1881148018, 11.8949459974), align=None)
        Polygon((-39.5436757168, 19.7846933413), (-26.1944497484, 19.7953973669), (-26.1976891851, 23.835370088), (-26.200784695, 27.6958487364), (-39.5436757168, 21.938080333), (-39.5436757168, 19.7899214696), align=None)
        Polygon((-44.6623679209, 13.0558049194), (-42.9541503357, -1.375640971), (-39.6124255104, 0.5572791435), (-32.6182269329, 4.6028627334), (-29.2765021076, 6.5357828479), (-40.9270034074, 15.2204132012), align=None)
    extrude(amount=F6_DEPTH)


with BuildPart() as f6b:
    # F0 (on Front) → F6, piece 2 (new body)
    with BuildSketch(Plane.XZ):
        with BuildLine():
            Line((-46.0637980065, 45.2877605461), (-46.0637980065, 46.4054723665))
            ThreePointArc((-46.0637980065, 46.4054723665), (-64.8836783627, 38.6144422615), (-72.689796607, 19.800815161))
            Line((-72.689796607, 19.800815161), (-68.154629778, 19.7971786549))
            Line((-68.154629778, 19.7971786549), (-68.1546013711, 19.8148920808))
            Line((-68.1546013711, 19.8148920808), (-68.154629778, 23.8371539736))
            Line((-68.154629778, 23.8371539736), (-68.154629778, 32.5336128762))
            Line((-68.154629778, 32.5336128762), (-60.5941352435, 36.8986664309))
            Line((-60.5941352435, 36.8986664309), (-53.5951523391, 40.9395310947))
            Line((-53.5951523391, 40.9395310947), (-46.0637980065, 45.2877605461))
        make_face()
        with BuildLine():
            ThreePointArc((-72.689796607, 19.800815161), (-64.8987750617, 0.95958485), (-46.0637980065, -6.8465419539))
            Line((-46.0637980065, -6.8465419539), (-46.0637980065, -5.7525028001))
            Line((-46.0637980065, -5.7525028001), (-46.1047054376, -5.7287973321))
            Line((-46.1047054376, -5.7287973321), (-53.6290768678, -1.3684955049))
            Line((-53.6290768678, -1.3684955049), (-60.6215704726, 2.6835881708))
            Line((-60.6215704726, 2.6835881708), (-68.1750550866, 7.0607608116))
            Line((-68.1750550866, 7.0607608116), (-68.1611086512, 15.7572085313))
            Line((-68.1611086512, 15.7572085313), (-68.1546581848, 19.7794652518))
            Line((-68.1546581848, 19.7794652518), (-68.154629778, 19.7971786549))
            Line((-68.154629778, 19.7971786549), (-72.689796607, 19.800815161))
        make_face()
        Polygon((-52.4843357543, 39.0119725608), (-53.5951523391, 40.9395310947), (-60.5941352435, 36.8986664309), (-59.4850132051, 34.9776107085), align=None)
        Polygon((-65.9331462645, 19.7953973669), (-68.154629778, 19.7971786549), (-68.1546581848, 19.7794652518), (-68.1611086512, 15.7572085313), (-65.9363857011, 15.7554246458), align=None)
        Polygon((-68.1546013711, 19.8148920808), (-68.154629778, 19.7971786549), (-65.9331462645, 19.7953973669), (-65.9299068279, 23.835370088), (-68.154629778, 23.8371539736), align=None)
        Polygon((-47.4544436145, 26.5053643083), (-49.139515419, 40.9395310947), (-52.4843357543, 39.0119725608), (-59.4850132051, 34.9776107085), (-62.8298335403, 33.0500521746), (-51.1932746881, 24.3467491815), align=None)
        Polygon((-52.5839202961, 19.7846933413), (-65.9331462645, 19.7953973669), (-65.9363857011, 15.7554246458), (-65.9394812111, 11.8949459974), (-52.5873736641, 17.6313091186), (-52.5839286804, 19.7794652197), align=None)
        Polygon((-65.9299068279, 23.835370088), (-65.9331462645, 19.7953973669), (-52.5839202961, 19.7846933413), (-52.5839202961, 19.7899214696), (-52.5839202961, 21.938080333), (-65.9268113179, 27.6958487364), align=None)
        Polygon((-60.6215704726, 2.6835881708), (-53.6290768678, -1.3684955049), (-52.5151705026, 0.5572791435), (-59.5093690801, 4.6028627334), align=None)
        Polygon((-49.1734456773, -1.375640971), (-47.4652280921, 13.0558049194), (-51.2005926056, 15.2204132012), (-62.8510939054, 6.5357828479), (-59.5093690801, 4.6028627334), (-52.5151705026, 0.5572791435), align=None)
    extrude(amount=F6_DEPTH)


solid = Compound([f1.part, f2.part, f5.part, f6.part, f6b.part])
